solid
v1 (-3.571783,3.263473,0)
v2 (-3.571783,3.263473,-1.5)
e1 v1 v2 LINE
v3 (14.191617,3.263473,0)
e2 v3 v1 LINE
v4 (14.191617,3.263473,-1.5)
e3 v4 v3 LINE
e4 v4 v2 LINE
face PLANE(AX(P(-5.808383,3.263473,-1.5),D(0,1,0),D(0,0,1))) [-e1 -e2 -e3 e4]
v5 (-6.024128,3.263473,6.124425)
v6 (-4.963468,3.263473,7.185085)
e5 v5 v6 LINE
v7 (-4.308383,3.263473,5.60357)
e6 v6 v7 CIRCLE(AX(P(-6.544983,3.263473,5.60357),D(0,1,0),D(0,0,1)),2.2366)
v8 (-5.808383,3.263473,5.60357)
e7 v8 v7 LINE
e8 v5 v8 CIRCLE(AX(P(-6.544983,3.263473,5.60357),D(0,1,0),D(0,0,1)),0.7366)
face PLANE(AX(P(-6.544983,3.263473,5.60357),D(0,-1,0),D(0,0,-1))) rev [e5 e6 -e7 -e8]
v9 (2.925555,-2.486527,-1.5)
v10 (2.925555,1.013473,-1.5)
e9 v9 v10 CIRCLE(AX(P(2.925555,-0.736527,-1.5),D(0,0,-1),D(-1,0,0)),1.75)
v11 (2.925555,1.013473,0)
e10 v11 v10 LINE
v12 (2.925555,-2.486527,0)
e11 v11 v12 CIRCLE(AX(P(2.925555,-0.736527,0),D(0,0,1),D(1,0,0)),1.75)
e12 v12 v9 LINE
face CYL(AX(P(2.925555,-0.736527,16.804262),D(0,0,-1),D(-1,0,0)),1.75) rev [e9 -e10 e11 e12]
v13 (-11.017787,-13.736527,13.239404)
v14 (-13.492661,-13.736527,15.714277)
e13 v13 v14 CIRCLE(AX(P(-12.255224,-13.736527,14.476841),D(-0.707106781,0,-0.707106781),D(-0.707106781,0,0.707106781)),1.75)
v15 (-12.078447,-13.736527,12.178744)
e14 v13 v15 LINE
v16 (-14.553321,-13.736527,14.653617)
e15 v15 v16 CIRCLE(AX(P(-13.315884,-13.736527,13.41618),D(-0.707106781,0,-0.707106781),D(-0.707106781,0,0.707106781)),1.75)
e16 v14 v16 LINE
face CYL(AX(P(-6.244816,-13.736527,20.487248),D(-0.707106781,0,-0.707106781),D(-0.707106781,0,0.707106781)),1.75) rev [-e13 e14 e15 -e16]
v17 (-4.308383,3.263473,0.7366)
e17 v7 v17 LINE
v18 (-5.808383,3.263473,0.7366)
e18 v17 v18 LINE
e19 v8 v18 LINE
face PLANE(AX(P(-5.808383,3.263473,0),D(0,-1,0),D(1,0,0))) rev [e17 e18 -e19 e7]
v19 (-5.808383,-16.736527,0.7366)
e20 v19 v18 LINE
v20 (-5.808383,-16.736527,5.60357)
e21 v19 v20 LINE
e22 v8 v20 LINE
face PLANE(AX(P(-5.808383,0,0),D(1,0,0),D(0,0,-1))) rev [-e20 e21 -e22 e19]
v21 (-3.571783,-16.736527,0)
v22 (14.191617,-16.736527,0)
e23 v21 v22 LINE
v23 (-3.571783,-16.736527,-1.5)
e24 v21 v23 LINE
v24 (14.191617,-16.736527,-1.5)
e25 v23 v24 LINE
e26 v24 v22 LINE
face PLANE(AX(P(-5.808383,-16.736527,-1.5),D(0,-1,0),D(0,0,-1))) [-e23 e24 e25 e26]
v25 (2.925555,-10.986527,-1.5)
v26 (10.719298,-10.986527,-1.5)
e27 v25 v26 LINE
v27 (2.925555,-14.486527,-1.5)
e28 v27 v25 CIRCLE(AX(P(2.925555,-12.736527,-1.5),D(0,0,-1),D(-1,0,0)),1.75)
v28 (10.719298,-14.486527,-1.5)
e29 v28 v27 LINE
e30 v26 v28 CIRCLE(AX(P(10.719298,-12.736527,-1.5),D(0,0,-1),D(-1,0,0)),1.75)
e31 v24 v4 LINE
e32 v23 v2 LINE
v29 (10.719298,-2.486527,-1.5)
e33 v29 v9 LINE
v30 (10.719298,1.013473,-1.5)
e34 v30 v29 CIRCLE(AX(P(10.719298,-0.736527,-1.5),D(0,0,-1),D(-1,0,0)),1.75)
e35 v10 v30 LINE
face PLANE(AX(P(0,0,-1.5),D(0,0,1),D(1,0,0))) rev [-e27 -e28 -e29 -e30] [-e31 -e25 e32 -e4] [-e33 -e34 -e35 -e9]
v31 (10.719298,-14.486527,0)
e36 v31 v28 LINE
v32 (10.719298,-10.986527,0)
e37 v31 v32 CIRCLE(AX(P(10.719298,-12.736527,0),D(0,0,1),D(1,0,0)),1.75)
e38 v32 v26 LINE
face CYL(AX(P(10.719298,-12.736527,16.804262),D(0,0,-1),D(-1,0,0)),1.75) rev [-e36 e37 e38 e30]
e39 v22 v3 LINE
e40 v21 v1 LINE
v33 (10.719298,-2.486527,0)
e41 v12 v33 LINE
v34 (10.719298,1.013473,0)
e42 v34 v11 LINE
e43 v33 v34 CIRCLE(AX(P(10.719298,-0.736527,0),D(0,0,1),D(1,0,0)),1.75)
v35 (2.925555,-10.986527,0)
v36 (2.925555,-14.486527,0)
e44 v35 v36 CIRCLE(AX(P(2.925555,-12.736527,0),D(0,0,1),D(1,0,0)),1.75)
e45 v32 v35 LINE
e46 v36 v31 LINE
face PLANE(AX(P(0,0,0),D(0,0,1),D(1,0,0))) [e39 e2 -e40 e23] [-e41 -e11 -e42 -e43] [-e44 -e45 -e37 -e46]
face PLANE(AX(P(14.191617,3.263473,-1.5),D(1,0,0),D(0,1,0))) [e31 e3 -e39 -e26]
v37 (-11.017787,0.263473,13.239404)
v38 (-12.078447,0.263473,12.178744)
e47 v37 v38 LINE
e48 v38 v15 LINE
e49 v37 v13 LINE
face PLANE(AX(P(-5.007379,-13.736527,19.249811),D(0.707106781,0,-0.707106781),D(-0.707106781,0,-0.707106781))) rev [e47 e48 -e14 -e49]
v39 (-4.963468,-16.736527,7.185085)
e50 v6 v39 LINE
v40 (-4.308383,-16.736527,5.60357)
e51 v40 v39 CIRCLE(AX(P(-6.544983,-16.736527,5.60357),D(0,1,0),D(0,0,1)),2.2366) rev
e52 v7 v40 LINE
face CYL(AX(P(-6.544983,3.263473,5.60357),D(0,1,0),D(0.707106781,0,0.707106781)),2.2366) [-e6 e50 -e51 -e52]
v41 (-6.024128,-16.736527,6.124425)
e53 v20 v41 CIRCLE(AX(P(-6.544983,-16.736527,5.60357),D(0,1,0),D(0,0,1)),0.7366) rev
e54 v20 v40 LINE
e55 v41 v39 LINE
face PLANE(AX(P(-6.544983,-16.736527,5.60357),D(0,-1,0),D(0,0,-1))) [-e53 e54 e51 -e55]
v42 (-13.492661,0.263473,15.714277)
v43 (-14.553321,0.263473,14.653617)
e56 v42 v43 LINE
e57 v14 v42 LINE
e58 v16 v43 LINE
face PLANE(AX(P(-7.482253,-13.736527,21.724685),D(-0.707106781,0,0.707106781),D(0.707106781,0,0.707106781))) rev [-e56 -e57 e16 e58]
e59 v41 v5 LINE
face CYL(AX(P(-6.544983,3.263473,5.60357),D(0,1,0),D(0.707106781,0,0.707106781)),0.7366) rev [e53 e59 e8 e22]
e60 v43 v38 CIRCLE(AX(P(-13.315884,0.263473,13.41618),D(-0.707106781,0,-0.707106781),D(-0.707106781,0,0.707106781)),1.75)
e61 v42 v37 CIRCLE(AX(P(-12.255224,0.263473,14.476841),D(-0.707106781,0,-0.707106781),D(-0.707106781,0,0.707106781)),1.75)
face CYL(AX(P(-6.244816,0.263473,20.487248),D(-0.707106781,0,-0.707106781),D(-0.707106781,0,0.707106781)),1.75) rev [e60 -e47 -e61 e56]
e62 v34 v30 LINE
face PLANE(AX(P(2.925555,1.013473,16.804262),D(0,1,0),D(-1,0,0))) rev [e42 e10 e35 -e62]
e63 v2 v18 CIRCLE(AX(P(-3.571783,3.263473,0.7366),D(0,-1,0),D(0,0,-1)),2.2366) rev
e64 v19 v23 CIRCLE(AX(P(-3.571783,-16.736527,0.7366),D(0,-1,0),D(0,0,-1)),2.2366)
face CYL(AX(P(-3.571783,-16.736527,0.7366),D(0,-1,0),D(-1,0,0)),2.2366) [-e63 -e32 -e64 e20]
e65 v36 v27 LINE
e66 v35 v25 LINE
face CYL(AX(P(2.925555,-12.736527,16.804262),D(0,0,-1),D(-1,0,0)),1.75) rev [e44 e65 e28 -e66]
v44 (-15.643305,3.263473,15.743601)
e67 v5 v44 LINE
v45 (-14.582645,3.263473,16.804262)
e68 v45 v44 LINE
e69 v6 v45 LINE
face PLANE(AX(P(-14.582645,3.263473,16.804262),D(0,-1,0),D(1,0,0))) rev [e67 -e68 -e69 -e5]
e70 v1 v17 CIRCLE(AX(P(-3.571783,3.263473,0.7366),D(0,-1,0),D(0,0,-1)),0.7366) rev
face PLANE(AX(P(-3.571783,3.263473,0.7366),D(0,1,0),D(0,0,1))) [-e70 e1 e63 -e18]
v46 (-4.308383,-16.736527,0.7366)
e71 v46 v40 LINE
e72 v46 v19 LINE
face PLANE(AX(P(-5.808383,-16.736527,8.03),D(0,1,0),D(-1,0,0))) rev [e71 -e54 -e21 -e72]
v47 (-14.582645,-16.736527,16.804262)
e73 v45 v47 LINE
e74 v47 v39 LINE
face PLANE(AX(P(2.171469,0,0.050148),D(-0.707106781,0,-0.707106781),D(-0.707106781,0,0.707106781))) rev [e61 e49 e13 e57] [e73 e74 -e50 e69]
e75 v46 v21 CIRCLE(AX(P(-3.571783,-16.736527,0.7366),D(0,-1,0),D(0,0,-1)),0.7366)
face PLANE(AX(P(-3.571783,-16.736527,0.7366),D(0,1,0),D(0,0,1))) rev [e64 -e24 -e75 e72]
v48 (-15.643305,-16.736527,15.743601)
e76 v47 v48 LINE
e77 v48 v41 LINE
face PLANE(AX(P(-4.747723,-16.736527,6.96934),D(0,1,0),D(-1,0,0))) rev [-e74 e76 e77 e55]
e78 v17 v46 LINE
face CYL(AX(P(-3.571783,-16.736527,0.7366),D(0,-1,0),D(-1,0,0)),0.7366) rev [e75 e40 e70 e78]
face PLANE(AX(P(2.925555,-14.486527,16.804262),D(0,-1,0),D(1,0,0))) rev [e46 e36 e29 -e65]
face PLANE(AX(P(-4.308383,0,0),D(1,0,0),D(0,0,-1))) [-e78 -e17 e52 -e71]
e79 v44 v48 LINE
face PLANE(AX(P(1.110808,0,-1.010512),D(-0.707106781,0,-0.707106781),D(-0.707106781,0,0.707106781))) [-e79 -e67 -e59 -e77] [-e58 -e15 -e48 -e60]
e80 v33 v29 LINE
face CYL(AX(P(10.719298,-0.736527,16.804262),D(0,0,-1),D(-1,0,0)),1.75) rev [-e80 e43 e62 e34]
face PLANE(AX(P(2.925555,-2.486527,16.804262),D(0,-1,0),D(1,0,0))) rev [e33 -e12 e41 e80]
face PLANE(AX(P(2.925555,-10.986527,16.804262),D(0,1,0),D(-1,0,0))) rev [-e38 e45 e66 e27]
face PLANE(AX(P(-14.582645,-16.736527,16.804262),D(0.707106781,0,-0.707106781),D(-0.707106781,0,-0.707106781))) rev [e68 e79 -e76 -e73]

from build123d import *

# Parameters (mm, degrees)
SKETCH1_W                    = 20
SKETCH1_H                    = 20
BASE_FLANGE1_DEPTH           = 1.5
EDGE_FLANGE1_STRIP_W         = 7.4732
EDGE_FLANGE1_STRIP_H         = 1.5
EDGE_FLANGE1_STRIP_CUT_DEPTH = 20
EDGE_FLANGE1_DEPTH           = 20
EDGE_FLANGE2_START           = -16.736526946
EDGE_FLANGE2_DEPTH           = 20
EDGE_FLANGE2_2_DEPTH         = 20
CUT_EXTRUDE1_DEPTH           = 30.323545381
CUT_EXTRUDE2_DEPTH           = 10


# Read off the part's stored shape, not the designer's step: Edge-Flange2
# Sheet-metal steps are written as plain solids
with BuildPart() as part:
    # Sketch1 → Base-Flange1 (new body)
    with BuildSketch(Plane.XY):
        with Locations((4.191616766, -6.736526946)):
            Rectangle(SKETCH1_W, SKETCH1_H)
    extrude(amount=-BASE_FLANGE1_DEPTH)

    # Edge-Flange1 strip (across the edge) → Edge-Flange1 strip cut (cut)
    with BuildSketch(Plane(origin=(-5.808383234, 3.263473054, 0), x_dir=(1, 0, 0), z_dir=(0, -1, 0))):
        with Locations((-1.5, -0.75)):
            Rectangle(EDGE_FLANGE1_STRIP_W, EDGE_FLANGE1_STRIP_H)
    extrude(amount=EDGE_FLANGE1_STRIP_CUT_DEPTH, mode=Mode.SUBTRACT)

    # Edge-Flange1 section (across the edge) → Edge-Flange1 (add)
    with BuildSketch(Plane(origin=(-5.808383234, 3.263473054, 0), x_dir=(1, 0, 0), z_dir=(0, -1, 0))):
        with BuildLine():
            Line((0, 0.7366), (0, 8.03))
            Line((0, 8.03), (1.5, 8.03))
            Line((1.5, 8.03), (1.5, 0.7366))
            ThreePointArc((1.5, 0.7366), (1.715745145, 0.215745145), (2.2366, 0))
            Line((2.2366, 0), (2.2366, -1.5))
            ThreePointArc((2.2366, -1.5), (0.655084973, -0.844915027), (0, 0.7366))
        make_face()
    extrude(amount=EDGE_FLANGE1_DEPTH)

    # Edge-Flange2 outline → Edge-Flange2 (cut)
    with BuildSketch(Plane(origin=(0, 0, 0), x_dir=(1, 0, 0), z_dir=(0, 1, 0)).offset(EDGE_FLANGE2_START)):
        with BuildLine():
            ThreePointArc((-4.308383234, -5.603569946), (-4.478634271, -6.459479711), (-4.963468207, -7.185084973))
            Line((-4.963468207, -7.185084973), (-5.808383234, -8.03))
            Line((-5.808383234, -8.03), (-4.308383234, -8.03))
            Line((-4.308383234, -8.03), (-4.308383234, -5.603569946))
        make_face()
    extrude(amount=EDGE_FLANGE2_DEPTH, mode=Mode.SUBTRACT)

    # Edge-Flange2 2 outline → Edge-Flange2 2 (add)
    with BuildSketch(Plane(origin=(0, 0, 0), x_dir=(1, 0, 0), z_dir=(0, 1, 0)).offset(EDGE_FLANGE2_START)):
        with BuildLine():
            Line((-14.582644764, -16.804261531), (-5.808383234, -8.03))
            Line((-5.808383234, -8.03), (-5.808383234, -5.603569946))
            ThreePointArc((-5.808383234, -5.603569946), (-5.86445357, -5.885454563), (-6.024128379, -6.124424801))
            Line((-6.024128379, -6.124424801), (-15.643304936, -15.743601359))
            Line((-15.643304936, -15.743601359), (-14.582644764, -16.804261531))
        make_face()
    extrude(amount=EDGE_FLANGE2_2_DEPTH)

    # Sketch12 → Cut-Extrude1 (cut, through all)
    with BuildSketch(Plane(origin=(0, 0, -1.5), x_dir=(-1, 0, 0), z_dir=(0, 0, -1))):
        with BuildLine():
            Line((-2.925555282, -14.486526946), (-10.71929847, -14.486526946))
            ThreePointArc((-10.71929847, -14.486526946), (-12.46929847, -12.736526946), (-10.71929847, -10.986526946))
            Line((-10.71929847, -10.986526946), (-2.925555282, -10.986526946))
            ThreePointArc((-2.925555282, -10.986526946), (-1.175555282, -12.736526946), (-2.925555282, -14.486526946))
        make_face()
        with BuildLine():
            Line((-2.925555282, -2.486526946), (-10.71929847, -2.486526946))
            ThreePointArc((-10.71929847, -2.486526946), (-12.46929847, -0.736526946), (-10.71929847, 1.013473054))
            Line((-10.71929847, 1.013473054), (-2.925555282, 1.013473054))
            ThreePointArc((-2.925555282, 1.013473054), (-1.175555282, -0.736526946), (-2.925555282, -2.486526946))
        make_face()
    extrude(amount=-CUT_EXTRUDE1_DEPTH, mode=Mode.SUBTRACT)

    # Sketch13 → Cut-Extrude2 (cut)
    with BuildSketch(Plane(origin=(0.050148211, 0, 0.050148211), x_dir=(-0.7071067811865465, 0, 0.7071067811865487), z_dir=(-0.7071067811865487, 0, -0.7071067811865465))):
        with BuildLine():
            Line((17.152424018, -13.736526946), (17.152424018, 0.263473054))
            ThreePointArc((17.152424018, 0.263473054), (18.902424018, 2.013473054), (20.652424018, 0.263473054))
            Line((20.652424018, 0.263473054), (20.652424018, -13.736526946))
            ThreePointArc((20.652424018, -13.736526946), (18.902424018, -15.486526946), (17.152424018, -13.736526946))
        make_face()
    extrude(amount=-CUT_EXTRUDE2_DEPTH, mode=Mode.SUBTRACT)


solid = part.part
